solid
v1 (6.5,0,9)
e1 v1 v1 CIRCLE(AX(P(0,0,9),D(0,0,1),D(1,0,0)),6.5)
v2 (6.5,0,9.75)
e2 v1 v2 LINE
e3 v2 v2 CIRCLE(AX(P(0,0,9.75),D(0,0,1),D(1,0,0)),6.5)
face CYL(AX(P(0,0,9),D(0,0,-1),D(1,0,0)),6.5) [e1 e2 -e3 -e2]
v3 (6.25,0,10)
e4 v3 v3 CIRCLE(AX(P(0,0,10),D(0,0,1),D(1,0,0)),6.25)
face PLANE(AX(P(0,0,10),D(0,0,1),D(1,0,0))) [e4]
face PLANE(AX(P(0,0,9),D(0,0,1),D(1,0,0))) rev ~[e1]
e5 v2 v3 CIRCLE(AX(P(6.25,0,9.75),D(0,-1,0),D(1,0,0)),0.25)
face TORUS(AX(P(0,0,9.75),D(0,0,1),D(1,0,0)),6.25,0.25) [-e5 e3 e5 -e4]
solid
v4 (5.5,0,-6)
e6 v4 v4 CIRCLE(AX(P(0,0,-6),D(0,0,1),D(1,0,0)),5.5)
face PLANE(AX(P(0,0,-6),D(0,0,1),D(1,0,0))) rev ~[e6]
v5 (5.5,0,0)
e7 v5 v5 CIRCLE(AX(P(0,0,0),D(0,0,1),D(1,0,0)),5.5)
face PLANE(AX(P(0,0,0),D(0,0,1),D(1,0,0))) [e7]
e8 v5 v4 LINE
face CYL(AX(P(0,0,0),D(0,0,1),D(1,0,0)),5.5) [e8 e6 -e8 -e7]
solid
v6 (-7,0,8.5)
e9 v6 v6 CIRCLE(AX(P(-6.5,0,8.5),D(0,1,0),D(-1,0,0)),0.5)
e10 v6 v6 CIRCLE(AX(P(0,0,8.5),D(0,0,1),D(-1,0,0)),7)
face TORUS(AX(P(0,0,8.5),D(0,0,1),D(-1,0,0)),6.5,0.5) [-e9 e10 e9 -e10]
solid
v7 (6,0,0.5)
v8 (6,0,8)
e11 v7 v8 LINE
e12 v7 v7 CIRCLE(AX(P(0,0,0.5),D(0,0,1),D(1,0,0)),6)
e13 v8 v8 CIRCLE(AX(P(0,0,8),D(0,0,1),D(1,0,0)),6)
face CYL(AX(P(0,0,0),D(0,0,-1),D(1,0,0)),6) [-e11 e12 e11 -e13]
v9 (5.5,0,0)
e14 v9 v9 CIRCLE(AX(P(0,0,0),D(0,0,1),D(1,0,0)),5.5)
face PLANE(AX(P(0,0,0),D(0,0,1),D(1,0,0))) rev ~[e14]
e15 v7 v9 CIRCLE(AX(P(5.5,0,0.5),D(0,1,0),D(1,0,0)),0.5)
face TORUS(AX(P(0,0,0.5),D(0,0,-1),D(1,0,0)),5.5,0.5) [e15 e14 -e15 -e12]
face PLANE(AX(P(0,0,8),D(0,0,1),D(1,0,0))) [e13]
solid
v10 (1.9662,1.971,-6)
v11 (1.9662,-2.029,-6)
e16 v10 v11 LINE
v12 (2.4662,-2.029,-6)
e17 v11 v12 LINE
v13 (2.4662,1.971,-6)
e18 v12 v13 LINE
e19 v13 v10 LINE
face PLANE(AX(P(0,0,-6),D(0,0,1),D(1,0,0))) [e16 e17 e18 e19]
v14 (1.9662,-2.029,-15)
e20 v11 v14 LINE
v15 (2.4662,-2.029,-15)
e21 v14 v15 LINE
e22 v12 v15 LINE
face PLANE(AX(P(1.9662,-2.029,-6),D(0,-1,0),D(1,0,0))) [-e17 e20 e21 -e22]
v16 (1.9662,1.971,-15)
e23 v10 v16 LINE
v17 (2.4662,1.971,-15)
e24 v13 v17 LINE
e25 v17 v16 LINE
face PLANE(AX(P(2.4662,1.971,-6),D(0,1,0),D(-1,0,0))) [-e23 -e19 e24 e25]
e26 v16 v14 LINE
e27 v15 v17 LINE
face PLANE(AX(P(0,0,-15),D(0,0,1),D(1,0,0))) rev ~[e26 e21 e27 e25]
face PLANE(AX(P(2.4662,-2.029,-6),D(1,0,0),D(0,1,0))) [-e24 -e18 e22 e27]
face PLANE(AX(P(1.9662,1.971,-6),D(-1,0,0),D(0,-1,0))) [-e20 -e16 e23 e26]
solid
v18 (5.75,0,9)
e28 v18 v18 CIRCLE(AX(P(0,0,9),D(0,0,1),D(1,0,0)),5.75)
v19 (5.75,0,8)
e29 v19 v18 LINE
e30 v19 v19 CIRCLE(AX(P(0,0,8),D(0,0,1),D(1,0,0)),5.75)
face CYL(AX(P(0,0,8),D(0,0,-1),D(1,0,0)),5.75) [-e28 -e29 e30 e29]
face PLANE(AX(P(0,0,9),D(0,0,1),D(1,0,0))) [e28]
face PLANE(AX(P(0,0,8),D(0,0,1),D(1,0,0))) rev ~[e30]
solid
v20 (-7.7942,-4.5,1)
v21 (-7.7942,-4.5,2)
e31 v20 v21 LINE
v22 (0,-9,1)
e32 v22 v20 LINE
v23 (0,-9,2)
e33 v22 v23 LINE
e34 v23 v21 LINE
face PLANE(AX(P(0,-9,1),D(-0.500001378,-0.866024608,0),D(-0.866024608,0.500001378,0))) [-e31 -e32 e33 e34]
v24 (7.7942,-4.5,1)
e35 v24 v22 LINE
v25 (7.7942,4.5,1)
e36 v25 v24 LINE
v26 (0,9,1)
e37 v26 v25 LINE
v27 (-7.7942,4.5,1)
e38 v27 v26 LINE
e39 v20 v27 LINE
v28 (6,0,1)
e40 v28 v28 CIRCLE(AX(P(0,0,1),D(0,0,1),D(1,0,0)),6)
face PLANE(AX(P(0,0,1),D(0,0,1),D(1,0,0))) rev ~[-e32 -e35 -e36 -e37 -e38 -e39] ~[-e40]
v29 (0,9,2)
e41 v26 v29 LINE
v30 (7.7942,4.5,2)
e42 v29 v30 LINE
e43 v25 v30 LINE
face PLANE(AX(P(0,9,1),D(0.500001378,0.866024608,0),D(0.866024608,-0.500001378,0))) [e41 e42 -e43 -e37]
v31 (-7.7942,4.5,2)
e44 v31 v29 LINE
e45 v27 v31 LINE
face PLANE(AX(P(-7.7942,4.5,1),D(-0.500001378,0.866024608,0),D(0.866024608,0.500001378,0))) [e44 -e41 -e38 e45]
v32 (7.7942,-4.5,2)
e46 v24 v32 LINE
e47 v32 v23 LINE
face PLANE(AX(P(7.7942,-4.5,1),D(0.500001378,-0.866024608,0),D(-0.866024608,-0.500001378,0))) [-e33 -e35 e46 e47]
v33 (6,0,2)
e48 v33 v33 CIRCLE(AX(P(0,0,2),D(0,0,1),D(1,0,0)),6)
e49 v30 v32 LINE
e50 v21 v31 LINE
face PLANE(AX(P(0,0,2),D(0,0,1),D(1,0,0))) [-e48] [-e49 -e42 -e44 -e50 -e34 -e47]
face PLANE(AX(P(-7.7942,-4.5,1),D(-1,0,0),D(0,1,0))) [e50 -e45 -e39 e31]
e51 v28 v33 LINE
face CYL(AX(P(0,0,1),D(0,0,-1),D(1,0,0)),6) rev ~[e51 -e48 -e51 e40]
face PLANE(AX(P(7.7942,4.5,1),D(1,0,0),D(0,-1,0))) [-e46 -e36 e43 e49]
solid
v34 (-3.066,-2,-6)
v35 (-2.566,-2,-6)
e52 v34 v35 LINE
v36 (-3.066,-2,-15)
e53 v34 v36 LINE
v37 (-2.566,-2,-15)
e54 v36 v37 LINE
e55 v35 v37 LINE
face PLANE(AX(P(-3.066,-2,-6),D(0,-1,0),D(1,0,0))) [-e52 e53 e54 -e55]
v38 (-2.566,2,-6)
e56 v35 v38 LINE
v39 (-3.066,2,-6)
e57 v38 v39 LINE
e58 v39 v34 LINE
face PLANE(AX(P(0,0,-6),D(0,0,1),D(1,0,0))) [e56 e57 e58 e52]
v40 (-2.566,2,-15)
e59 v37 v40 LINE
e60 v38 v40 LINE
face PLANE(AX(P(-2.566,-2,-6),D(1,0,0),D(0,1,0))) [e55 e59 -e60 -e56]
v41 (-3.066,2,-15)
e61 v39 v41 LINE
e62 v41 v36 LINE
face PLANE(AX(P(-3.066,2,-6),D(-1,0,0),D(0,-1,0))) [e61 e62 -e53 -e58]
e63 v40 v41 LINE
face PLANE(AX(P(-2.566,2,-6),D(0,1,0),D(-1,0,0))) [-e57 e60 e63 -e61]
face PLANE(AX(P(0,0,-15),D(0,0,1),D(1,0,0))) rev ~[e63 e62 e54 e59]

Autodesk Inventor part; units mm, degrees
ref_plane "YZ Plane" through (0, 0, 0) normal (1, 0, 0) x (0, 1, 0)
ref_plane "XZ Plane" through (0, 0, 0) normal (0, 1, 0) x (-1, 0, 0)
ref_plane "XY Plane" through (0, 0, 0) normal (0, 0, 1) x (1, 0, 0)
sketch "Skizze1" plane through (0, 0, 0) normal (0, 0, 1) x (1, 0, 0)
  circle A0 centre (0, 0) radius 5.5
  dimension "d0" = 11
extrude "Extrusion1" add sketch "Skizze1" against normal blind 6
sketch "Skizze2" plane through (0, 0, 0) normal (0, 0, 1) x (1, 0, 0)
  circle A0 centre (0, 0) radius 6
  dimension "d5" = 12
extrude "Extrusion2" add sketch "Skizze2" along normal blind 8 separate body
thread "Gewinde1" size "M12x1.75" class "6g" standard "ANSI Metric M Profile" full length
sketch "Skizze3" plane through (0, 0, 0) normal (0, 0, 1) x (1, 0, 0)
  circle A0 centre (0, 0) radius 5.75
  dimension "d10" = 11.5
extrude "Extrusion3" add sketch "Skizze3" along normal blind 1 separate body
move or copy body "Körper verschieben1" bodies to move or copy 3 copy no translate (0, 0, 8)
fillet "Rundung1" radius 0.5 1 edges at (-6, 0, 0)
sketch "Skizze4" plane through (0, 0, 0) normal (0, 0, 1) x (1, 0, 0)
  circle A0 centre (0, 0) radius 6.5
  dimension "d19" = 13
extrude "Extrusion4" add sketch "Skizze4" along normal blind 1 separate body
move or copy body "Körper verschieben2" bodies to move or copy 4 copy no translate (0, 0, 9)
fillet "Rundung2" radius 0.25 1 edges at (-6.5, 0, 10)
sketch "Skizze5" plane through (0, 0, 0) normal (0, 1, 0) x (-1, 0, 0)
  circle A0 centre (6.5, 0) radius 0.5
  line L0 (0, -3.25) -> (0, 3.25)
  line L1 (0, 0) -> (6.5, 0) construction
  dimension "d26" = 1
  dimension "d27" = 6.5
revolve "Umdrehung1" add sketch "Skizze5" angle 360 about axis through (0, 0, -3.25) along (0, 0, 1) separate body
move or copy body "Körper verschieben3" bodies to move or copy 5 copy no translate (0, 0, 8.5)
sketch "Skizze6" plane through (0, 0, 0) normal (0, 0, 1) x (1, 0, 0)
  line L0 (0, 9) -> (7.7942, 4.5)
  line L1 (7.7942, 4.5) -> (7.7942, -4.5)
  line L2 (7.7942, -4.5) -> (0, -9)
  line L3 (0, -9) -> (-7.7942, -4.5)
  line L4 (-7.7942, -4.5) -> (-7.7942, 4.5)
  line L5 (-7.7942, 4.5) -> (0, 9)
  circle A0 centre (0, 0) radius 6
  dimension "d32" = 12
extrude "Extrusion5" add sketch "Skizze6" along normal blind 1 separate body
move or copy body "Körper verschieben4" bodies to move or copy 6 copy no translate (0, 0, 1)
sketch "Skizze7" plane through (0, 0, 0) normal (0, 0, 1) x (1, 0, 0)
  line L0 (-3.066, -2) -> (-2.566, -2)
  line L1 (-2.566, -2) -> (-2.566, 2)
  line L2 (-2.566, 2) -> (-3.066, 2)
  line L3 (-3.066, 2) -> (-3.066, -2)
  line L4 (-3.066, -2) -> (-2.566, 2) construction
  line L5 (-2.566, -2) -> (-3.066, 2) construction
  line L6 (1.9662, -2.029) -> (2.4662, -2.029)
  line L7 (2.4662, -2.029) -> (2.4662, 1.971)
  line L8 (2.4662, 1.971) -> (1.9662, 1.971)
  line L9 (1.9662, 1.971) -> (1.9662, -2.029)
  line L10 (1.9662, -2.029) -> (2.4662, 1.971) construction
  line L11 (2.4662, -2.029) -> (1.9662, 1.971) construction
  point P0 (0, 0)
  point P1 (-2.816, 0)
  point P2 (2.2162, -0.029)
  dimension "d38" = 0.5
  dimension "d39" = 4
  dimension "d40" = 0.5
  dimension "d41" = 4
extrude "Extrusion6" add sketch "Skizze7" against normal blind 9 separate body
move or copy body "Körper verschieben5" bodies to move or copy 7 copy no translate (0, 0, -6)
properties part number "Hohlstecker" material "Stahl, verchromt"
